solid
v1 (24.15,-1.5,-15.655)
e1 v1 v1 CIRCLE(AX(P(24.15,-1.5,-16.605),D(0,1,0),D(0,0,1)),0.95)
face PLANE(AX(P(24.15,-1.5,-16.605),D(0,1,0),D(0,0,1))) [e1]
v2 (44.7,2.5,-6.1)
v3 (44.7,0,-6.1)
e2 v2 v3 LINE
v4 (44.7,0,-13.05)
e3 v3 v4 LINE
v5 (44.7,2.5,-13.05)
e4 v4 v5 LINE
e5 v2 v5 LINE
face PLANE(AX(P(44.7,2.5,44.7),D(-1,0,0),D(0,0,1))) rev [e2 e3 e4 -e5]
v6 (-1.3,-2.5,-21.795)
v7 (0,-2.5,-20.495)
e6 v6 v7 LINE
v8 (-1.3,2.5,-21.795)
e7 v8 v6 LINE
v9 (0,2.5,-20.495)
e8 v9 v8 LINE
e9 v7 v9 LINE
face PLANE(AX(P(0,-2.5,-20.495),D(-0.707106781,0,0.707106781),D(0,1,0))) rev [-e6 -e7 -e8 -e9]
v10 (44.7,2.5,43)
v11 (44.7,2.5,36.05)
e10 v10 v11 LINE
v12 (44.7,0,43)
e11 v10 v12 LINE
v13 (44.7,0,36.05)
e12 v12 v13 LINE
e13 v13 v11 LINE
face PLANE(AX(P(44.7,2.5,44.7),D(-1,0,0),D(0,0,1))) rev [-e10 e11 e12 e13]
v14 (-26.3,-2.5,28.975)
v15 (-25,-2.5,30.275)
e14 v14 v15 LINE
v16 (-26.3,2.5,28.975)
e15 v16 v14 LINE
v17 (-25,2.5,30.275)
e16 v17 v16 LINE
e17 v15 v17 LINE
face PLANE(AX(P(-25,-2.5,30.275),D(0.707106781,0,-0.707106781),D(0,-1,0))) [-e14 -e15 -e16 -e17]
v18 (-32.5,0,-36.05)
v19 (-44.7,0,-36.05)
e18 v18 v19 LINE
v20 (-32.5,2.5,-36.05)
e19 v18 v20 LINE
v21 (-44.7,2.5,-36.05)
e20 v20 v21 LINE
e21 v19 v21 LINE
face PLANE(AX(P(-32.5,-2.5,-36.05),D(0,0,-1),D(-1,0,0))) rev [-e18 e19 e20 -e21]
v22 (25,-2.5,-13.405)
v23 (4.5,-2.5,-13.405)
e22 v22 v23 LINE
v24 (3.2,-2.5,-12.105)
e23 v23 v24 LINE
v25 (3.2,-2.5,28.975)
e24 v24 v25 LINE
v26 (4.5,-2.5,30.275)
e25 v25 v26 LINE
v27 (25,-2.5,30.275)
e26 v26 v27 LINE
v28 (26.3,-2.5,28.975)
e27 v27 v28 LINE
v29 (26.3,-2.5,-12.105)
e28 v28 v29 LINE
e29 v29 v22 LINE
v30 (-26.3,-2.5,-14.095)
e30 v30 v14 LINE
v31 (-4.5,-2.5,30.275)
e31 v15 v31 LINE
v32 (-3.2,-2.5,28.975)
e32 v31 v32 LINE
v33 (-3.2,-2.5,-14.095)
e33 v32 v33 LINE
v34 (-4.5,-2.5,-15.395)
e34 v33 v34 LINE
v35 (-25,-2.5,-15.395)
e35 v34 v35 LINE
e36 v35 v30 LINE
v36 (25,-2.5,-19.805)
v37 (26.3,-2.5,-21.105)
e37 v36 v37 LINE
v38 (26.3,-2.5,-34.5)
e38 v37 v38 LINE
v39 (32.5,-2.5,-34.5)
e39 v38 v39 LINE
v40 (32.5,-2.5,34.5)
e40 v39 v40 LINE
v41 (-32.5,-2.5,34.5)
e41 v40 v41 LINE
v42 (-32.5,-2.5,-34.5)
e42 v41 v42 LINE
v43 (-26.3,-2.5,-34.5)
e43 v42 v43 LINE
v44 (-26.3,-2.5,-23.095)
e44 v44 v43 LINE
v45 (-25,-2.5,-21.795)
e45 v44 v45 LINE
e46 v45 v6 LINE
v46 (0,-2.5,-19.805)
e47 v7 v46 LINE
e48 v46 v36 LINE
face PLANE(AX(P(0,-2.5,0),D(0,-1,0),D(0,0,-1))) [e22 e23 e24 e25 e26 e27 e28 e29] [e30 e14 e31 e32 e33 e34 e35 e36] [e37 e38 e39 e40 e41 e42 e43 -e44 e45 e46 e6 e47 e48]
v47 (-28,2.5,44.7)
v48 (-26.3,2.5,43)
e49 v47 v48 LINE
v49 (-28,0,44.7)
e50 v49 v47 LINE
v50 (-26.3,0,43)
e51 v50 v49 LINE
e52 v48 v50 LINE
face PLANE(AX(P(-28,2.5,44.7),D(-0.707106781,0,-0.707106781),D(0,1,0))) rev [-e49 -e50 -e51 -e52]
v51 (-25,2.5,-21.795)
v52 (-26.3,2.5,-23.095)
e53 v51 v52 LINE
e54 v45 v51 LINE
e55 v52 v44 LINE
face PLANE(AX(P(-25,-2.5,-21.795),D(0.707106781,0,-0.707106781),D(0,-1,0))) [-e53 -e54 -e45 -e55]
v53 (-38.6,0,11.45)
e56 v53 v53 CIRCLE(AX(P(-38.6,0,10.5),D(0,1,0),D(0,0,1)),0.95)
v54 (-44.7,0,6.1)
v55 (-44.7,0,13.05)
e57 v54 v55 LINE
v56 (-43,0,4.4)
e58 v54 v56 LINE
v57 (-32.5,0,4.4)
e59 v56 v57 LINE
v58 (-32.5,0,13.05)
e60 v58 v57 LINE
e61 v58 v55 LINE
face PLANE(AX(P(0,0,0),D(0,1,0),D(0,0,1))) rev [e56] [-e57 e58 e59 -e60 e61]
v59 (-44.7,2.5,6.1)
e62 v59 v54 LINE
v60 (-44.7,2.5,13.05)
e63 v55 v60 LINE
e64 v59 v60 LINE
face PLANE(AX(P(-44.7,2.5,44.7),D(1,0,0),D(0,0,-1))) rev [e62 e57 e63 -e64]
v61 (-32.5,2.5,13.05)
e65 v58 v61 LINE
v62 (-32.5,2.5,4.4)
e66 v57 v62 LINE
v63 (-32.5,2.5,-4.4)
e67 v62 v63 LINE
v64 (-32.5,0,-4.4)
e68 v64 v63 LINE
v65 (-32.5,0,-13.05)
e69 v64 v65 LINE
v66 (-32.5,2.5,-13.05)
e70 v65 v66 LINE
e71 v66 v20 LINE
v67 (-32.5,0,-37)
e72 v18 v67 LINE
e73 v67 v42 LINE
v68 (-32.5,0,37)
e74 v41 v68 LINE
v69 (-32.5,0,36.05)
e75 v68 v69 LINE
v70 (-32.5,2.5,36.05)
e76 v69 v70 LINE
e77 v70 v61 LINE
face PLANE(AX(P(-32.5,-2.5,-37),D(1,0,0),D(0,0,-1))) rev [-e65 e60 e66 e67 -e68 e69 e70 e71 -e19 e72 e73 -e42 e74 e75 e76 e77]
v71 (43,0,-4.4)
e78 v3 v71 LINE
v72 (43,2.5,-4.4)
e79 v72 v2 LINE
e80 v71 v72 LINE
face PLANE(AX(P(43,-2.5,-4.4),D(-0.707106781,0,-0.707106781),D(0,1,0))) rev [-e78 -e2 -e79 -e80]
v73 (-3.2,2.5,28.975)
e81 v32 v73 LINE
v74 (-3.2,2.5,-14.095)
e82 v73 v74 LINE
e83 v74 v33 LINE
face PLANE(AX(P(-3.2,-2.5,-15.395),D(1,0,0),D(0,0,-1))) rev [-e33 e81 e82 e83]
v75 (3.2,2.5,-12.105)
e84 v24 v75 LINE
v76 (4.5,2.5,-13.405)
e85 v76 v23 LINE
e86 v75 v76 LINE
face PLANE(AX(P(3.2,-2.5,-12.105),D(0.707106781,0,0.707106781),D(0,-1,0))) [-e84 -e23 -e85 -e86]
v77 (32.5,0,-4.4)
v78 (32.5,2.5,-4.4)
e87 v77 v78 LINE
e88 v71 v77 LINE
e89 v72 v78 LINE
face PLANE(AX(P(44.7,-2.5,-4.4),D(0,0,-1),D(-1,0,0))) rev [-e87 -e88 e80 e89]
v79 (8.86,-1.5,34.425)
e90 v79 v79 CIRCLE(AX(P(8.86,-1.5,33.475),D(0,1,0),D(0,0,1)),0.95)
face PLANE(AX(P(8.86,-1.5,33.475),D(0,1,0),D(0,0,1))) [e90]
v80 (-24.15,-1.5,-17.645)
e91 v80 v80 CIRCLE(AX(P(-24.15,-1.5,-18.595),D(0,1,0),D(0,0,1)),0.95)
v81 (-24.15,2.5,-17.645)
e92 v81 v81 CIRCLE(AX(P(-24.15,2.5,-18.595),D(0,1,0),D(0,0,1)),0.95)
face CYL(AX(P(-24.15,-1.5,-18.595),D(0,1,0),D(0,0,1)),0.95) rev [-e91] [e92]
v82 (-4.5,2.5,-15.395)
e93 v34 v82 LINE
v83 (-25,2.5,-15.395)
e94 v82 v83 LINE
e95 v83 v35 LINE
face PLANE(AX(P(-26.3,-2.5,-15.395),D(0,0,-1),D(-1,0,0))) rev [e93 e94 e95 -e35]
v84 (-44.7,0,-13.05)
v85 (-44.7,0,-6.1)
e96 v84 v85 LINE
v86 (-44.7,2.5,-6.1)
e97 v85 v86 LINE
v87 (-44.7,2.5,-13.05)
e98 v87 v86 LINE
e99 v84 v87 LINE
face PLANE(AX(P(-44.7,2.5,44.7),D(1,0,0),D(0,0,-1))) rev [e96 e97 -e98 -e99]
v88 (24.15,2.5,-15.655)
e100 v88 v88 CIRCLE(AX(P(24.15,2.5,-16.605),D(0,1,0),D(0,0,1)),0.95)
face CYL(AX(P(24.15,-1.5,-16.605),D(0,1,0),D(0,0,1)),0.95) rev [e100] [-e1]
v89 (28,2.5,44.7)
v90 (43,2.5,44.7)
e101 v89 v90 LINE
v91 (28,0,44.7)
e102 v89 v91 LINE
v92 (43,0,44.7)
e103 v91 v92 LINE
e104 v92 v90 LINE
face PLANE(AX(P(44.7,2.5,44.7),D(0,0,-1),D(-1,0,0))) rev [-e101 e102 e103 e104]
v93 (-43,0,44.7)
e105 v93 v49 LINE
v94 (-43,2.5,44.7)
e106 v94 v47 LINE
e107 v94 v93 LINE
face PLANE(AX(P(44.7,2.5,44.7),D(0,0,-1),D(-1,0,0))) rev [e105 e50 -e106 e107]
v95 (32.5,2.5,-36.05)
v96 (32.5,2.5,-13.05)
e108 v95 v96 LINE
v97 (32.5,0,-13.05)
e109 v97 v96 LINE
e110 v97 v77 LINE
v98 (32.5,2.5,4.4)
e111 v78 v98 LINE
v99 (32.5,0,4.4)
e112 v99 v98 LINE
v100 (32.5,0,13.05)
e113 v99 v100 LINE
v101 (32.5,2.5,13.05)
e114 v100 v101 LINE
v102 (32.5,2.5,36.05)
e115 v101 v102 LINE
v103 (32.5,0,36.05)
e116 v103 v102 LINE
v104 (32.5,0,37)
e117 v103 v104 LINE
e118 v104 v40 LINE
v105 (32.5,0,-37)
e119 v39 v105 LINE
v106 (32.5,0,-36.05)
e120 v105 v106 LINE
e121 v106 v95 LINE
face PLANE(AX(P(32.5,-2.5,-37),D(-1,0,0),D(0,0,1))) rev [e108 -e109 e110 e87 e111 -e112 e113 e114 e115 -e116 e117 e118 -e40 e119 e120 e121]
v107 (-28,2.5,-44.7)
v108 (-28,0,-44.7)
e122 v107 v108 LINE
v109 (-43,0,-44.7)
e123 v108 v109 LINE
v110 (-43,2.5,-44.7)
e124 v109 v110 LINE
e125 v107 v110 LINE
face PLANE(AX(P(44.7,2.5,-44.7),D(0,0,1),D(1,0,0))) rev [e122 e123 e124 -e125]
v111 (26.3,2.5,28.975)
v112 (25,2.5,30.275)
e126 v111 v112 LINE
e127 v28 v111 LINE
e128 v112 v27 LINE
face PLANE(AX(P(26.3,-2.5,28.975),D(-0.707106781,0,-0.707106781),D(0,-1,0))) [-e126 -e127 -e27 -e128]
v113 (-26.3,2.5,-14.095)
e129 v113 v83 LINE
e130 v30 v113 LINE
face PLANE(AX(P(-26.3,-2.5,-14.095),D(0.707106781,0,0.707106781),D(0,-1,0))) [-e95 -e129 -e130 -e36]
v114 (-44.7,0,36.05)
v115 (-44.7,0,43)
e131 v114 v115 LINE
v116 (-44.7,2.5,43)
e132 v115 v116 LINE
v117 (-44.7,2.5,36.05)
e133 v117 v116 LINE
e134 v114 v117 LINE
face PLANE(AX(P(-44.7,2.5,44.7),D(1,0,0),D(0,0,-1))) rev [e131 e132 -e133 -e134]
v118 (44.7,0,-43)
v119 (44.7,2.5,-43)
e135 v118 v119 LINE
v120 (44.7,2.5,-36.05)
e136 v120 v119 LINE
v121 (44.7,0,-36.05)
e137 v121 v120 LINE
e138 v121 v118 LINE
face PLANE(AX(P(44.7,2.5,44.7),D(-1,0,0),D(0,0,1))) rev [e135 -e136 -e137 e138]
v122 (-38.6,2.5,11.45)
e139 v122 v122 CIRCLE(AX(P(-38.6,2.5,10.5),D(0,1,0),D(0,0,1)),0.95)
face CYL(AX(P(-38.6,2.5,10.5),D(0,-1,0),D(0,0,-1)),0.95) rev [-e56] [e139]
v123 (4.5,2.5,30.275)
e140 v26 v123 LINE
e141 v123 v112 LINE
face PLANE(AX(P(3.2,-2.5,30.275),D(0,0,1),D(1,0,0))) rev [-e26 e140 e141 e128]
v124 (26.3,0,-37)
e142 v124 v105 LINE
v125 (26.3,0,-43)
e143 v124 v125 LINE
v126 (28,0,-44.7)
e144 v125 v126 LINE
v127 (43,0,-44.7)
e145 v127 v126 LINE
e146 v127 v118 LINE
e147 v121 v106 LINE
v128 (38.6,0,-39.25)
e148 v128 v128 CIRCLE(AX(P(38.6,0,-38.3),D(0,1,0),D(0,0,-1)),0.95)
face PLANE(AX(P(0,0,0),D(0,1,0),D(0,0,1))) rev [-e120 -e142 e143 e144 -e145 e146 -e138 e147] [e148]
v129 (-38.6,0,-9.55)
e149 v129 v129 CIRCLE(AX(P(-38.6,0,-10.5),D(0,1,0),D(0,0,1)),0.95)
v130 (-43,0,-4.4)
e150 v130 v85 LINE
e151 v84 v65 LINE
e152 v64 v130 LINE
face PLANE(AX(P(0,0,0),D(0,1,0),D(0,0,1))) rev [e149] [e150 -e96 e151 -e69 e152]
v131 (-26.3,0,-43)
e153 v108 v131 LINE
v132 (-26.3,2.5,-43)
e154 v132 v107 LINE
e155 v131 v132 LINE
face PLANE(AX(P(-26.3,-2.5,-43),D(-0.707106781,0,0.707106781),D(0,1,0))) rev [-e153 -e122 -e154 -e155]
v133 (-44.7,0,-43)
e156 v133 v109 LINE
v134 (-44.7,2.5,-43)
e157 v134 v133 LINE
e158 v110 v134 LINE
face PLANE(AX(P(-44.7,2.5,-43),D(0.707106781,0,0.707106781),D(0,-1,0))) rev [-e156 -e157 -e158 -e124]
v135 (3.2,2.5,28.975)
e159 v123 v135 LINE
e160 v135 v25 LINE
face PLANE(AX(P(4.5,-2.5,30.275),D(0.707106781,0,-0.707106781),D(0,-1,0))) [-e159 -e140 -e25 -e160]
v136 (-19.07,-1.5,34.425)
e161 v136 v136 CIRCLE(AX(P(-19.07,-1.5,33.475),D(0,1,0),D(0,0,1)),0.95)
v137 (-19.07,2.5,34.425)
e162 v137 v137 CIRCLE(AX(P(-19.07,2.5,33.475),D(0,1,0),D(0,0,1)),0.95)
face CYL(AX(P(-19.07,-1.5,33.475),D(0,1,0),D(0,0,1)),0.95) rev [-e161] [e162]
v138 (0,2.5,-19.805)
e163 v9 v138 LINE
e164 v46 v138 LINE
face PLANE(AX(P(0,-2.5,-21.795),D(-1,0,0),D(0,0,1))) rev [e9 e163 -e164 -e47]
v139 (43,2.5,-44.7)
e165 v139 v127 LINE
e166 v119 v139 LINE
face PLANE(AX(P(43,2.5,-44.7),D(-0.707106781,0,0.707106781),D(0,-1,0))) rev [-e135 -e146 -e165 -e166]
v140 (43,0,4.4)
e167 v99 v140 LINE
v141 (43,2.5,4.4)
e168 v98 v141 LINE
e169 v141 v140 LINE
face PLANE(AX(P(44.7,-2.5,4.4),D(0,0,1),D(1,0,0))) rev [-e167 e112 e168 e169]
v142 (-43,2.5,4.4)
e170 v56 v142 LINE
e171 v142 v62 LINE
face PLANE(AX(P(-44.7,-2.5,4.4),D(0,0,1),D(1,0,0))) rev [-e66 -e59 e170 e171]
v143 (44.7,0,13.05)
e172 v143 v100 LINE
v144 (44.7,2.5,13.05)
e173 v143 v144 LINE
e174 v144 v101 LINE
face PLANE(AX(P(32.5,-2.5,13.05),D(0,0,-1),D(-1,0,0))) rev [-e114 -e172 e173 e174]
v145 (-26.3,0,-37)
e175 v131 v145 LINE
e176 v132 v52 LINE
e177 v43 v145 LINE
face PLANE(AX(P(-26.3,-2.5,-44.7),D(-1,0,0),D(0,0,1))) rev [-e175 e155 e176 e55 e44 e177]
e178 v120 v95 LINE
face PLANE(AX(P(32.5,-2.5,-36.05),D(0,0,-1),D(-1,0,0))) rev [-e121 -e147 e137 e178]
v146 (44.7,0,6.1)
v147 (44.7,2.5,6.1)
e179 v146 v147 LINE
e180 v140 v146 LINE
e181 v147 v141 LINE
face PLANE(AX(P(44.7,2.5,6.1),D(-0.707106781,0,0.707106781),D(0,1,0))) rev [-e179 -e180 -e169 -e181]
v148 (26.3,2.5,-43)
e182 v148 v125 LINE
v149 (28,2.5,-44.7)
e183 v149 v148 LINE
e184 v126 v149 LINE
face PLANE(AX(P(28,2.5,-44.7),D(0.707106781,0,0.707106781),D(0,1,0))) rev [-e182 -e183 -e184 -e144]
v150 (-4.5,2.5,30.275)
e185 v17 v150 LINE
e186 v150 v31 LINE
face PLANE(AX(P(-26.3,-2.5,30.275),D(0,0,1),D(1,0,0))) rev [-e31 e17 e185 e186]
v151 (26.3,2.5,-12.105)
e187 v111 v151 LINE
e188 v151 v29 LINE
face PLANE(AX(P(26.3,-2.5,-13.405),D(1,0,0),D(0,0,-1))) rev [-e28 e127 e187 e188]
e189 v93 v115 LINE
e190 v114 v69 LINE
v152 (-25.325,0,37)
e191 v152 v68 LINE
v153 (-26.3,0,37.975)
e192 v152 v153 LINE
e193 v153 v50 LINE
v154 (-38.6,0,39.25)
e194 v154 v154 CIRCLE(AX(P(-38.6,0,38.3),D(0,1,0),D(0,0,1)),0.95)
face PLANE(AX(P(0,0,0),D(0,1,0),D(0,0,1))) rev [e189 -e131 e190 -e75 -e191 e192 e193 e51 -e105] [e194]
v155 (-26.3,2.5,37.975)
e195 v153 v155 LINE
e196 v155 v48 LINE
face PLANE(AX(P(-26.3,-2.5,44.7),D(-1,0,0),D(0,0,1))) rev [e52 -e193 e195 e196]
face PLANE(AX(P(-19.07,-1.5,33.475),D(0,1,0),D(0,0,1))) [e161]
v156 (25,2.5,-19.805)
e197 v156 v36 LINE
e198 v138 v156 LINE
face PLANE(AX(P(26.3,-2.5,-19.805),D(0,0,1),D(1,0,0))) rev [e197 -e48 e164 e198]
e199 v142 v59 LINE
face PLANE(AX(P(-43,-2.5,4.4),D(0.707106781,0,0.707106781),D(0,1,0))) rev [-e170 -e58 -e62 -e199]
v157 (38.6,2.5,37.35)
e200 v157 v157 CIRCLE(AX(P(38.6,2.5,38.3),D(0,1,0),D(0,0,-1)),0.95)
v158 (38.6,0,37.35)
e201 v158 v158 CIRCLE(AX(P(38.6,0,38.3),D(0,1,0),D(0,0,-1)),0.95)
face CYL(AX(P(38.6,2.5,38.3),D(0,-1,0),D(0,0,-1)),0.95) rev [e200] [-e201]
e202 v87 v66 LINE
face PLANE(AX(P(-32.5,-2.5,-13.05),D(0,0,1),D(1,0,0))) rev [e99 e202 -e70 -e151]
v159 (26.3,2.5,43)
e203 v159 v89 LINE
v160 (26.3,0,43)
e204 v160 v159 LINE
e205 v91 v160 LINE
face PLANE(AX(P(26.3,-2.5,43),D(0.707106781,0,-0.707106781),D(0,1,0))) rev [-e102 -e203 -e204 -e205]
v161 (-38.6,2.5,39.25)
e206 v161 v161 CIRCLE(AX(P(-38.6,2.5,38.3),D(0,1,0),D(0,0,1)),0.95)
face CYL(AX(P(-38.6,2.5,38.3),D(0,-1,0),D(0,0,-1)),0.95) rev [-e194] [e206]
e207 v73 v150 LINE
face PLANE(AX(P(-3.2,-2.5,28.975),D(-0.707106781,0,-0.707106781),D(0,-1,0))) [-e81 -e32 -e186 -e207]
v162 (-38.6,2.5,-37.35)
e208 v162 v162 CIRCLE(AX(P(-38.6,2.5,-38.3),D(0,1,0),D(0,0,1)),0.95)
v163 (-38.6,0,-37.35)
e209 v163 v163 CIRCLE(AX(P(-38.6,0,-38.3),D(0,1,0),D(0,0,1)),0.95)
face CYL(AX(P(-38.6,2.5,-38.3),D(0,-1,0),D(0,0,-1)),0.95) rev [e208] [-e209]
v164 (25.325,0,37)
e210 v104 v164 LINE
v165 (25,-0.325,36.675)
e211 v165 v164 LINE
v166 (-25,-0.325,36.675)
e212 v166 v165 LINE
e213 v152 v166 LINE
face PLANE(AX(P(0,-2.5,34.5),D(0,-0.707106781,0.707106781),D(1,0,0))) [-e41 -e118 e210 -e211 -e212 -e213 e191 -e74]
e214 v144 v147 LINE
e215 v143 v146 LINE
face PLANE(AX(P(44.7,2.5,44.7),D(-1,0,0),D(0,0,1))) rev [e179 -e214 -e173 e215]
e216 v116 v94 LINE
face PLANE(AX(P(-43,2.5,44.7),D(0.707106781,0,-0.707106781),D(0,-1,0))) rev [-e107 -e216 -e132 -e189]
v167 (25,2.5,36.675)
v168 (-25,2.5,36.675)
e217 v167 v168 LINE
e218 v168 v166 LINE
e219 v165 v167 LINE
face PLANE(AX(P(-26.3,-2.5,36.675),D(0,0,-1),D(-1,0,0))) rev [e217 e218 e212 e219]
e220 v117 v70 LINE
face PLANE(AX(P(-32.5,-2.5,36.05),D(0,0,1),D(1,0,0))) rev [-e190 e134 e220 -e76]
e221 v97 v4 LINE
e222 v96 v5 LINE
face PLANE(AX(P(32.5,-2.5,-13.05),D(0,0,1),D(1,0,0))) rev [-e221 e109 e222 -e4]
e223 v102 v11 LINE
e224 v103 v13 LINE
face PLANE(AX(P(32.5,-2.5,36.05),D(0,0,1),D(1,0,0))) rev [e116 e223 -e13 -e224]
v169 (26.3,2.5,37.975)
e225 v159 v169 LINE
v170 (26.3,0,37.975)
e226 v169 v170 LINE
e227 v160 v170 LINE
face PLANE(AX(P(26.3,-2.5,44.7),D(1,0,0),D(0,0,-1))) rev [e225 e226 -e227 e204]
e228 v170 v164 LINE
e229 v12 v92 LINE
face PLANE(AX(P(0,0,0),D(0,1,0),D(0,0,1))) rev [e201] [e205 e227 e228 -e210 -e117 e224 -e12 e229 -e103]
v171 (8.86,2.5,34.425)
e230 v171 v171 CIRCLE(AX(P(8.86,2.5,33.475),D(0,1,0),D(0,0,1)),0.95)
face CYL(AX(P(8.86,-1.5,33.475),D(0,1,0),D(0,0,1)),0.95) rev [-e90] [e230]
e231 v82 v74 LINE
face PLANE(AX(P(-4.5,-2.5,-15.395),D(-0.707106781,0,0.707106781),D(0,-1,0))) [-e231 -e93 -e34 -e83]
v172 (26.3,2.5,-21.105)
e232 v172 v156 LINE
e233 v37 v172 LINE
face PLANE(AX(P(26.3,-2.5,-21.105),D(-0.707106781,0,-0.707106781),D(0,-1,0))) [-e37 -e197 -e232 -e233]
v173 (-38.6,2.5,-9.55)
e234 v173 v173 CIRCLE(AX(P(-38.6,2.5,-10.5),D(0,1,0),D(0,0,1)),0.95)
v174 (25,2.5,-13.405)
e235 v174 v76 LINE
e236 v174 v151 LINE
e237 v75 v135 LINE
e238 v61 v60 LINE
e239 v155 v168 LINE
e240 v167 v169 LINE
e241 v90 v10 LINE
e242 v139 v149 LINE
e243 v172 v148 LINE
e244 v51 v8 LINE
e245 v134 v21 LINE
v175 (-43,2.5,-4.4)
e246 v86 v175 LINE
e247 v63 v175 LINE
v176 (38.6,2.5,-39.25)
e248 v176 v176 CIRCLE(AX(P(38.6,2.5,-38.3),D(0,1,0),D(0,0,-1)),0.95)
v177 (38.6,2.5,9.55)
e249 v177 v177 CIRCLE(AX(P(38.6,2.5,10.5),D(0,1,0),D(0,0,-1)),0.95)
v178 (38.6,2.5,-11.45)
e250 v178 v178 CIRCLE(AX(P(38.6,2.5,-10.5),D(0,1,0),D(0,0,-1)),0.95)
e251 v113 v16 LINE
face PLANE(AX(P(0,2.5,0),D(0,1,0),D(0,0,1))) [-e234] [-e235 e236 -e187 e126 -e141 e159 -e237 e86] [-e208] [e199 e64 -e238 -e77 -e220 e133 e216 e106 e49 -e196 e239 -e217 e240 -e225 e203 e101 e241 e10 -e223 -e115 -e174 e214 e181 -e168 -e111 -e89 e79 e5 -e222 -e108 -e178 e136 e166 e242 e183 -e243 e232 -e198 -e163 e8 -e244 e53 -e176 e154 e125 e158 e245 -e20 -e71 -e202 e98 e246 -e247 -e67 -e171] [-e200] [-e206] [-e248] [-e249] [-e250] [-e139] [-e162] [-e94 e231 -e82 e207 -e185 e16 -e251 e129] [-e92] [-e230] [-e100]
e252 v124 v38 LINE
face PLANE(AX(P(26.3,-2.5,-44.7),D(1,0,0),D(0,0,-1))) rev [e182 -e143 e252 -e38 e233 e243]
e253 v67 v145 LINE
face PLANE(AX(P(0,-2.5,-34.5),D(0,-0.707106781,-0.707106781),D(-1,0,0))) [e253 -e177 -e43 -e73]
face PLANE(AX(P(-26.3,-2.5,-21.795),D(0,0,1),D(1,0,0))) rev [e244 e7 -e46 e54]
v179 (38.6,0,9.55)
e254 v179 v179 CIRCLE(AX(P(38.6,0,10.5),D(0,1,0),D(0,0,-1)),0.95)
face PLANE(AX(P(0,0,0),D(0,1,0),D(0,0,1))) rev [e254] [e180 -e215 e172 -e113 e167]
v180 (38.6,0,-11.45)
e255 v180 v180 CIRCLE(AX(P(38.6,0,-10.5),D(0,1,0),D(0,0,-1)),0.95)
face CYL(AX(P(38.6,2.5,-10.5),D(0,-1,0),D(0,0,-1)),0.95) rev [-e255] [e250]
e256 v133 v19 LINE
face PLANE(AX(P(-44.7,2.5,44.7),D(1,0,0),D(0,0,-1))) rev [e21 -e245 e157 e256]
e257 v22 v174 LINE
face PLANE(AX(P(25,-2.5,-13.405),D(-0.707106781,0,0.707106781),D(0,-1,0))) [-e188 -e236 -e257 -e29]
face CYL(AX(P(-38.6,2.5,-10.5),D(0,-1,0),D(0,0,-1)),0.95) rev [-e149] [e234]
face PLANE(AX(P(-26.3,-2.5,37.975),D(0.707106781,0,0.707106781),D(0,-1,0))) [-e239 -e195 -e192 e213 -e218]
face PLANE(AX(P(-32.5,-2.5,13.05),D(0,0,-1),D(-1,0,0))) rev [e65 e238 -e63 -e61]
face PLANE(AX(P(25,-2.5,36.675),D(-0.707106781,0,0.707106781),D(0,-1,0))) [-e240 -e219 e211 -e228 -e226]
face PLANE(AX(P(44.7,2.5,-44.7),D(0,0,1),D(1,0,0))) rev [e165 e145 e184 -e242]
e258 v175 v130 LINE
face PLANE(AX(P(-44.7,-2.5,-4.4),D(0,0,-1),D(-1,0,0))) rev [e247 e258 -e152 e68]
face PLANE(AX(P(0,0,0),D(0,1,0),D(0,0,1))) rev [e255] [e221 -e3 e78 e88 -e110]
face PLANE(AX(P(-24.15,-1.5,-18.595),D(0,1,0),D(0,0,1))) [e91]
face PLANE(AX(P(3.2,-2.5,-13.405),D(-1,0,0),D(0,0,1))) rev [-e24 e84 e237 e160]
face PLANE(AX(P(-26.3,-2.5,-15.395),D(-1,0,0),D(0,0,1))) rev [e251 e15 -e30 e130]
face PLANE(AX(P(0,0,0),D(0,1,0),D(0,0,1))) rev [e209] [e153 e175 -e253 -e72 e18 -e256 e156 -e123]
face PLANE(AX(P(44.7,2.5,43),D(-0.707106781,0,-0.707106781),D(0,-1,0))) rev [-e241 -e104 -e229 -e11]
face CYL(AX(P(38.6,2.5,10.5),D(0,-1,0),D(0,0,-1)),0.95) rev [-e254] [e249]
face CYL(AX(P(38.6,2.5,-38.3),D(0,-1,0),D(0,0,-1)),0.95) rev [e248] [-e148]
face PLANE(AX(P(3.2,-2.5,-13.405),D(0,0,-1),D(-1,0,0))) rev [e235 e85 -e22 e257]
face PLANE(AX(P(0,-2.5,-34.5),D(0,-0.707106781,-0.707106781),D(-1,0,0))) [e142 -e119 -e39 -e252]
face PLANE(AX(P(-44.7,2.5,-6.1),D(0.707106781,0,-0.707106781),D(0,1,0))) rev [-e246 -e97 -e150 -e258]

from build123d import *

# Parameters (mm, degrees)
SKETCH1_W               = 89.4
SKETCH1_H               = 89.4
SKETCH1_R               = 0.95
BOSS_EXTRUDE1_DEPTH     = 2.5
SKETCH5_W               = 65
SKETCH5_H               = 74
BOSS_EXTRUDE3_DEPTH     = 2.5
SKETCH7_R               = 0.95
CUT_EXTRUDE2_DEPTH      = 4
CUT_EXTRUDE1_DEPTH      = 64.412774738
CUT_EXTRUDE1_DEPTH_BACK = 64.412774738
SKETCH2_W               = 12.2
SKETCH2_H               = 23
SKETCH2_W_2             = 52.6
SKETCH2_H_2             = 8.025
SKETCH2_W_3             = 23.1
SKETCH2_H_3             = 45.67
SKETCH2_H_4             = 43.68
SKETCH2_H_5             = 8.8
CHAMFER2_SIZE           = 1.3
CHAMFER3_SIZE           = 1.3
CHAMFER4_SIZE           = 1.7
CHAMFER5_SIZE           = 2.5


with BuildPart() as part:
    # Sketch1 → Boss-Extrude1 (new body)
    with BuildSketch(Plane(origin=(0, 0, 0), x_dir=(1, 0, 0), z_dir=(0, 1, 0))):
        Rectangle(SKETCH1_W, SKETCH1_H)
        with Locations(Location((-38.6, 38.3, 0), (0, 0, 270))):
            Circle(SKETCH1_R, mode=Mode.SUBTRACT)
        with Locations(Location((-38.6, 10.5, 0), (0, 0, 270))):
            Circle(SKETCH1_R, mode=Mode.SUBTRACT)
        with Locations(Location((-38.6, -10.5, 0), (0, 0, 270))):
            Circle(SKETCH1_R, mode=Mode.SUBTRACT)
        with Locations(Location((-38.6, -38.3, 0), (0, 0, 270))):
            Circle(SKETCH1_R, mode=Mode.SUBTRACT)
        with Locations(Location((38.6, -38.3, 0), (0, 0, 90))):
            Circle(SKETCH1_R, mode=Mode.SUBTRACT)
        with Locations(Location((38.6, -10.5, 0), (0, 0, 90))):
            Circle(SKETCH1_R, mode=Mode.SUBTRACT)
        with Locations(Location((38.6, 10.5, 0), (0, 0, 90))):
            Circle(SKETCH1_R, mode=Mode.SUBTRACT)
        with Locations(Location((38.6, 38.3, 0), (0, 0, 90))):
            Circle(SKETCH1_R, mode=Mode.SUBTRACT)
    extrude(amount=BOSS_EXTRUDE1_DEPTH)

    # Sketch5 → Boss-Extrude3 (add)
    with BuildSketch(Plane.XZ):
        Rectangle(SKETCH5_W, SKETCH5_H)
    extrude(amount=BOSS_EXTRUDE3_DEPTH)

    # Sketch7 → Cut-Extrude2 (cut)
    with BuildSketch(Plane(origin=(0, 2.5, 0), x_dir=(1, 0, 0), z_dir=(0, 1, 0))):
        with Locations(Location((-24.15, 18.595, 0), (0, 0, 270))):
            Circle(SKETCH7_R)
        with Locations(Location((24.15, 16.605, 0), (0, 0, 270))):
            Circle(SKETCH7_R)
        with Locations(Location((-19.07, -33.475, 0), (0, 0, 270))):
            Circle(SKETCH7_R)
        with Locations(Location((8.86, -33.475, 0), (0, 0, 270))):
            Circle(SKETCH7_R)
    extrude(amount=-CUT_EXTRUDE2_DEPTH, mode=Mode.SUBTRACT)

    # Sketch2 → Cut-Extrude1 (cut, two sides: drawn at the far end of the back side and taken through both)
    with BuildSketch(Plane(origin=(0, 2.5, 0), x_dir=(1, 0, 0), z_dir=(0, 1, 0)).offset(-CUT_EXTRUDE1_DEPTH_BACK)):
        with Locations((-38.6, 24.55)):
            Rectangle(SKETCH2_W, SKETCH2_H)
        Polygon((-26.3, 44.7), (26.3, 44.7), (26.3, 24.23), (26.3, 19.805), (0, 19.805), (0, 21.795), (-26.3, 21.795), align=None)
        with Locations((0, -40.6875)):
            Rectangle(SKETCH2_W_2, SKETCH2_H_2)
        with Locations((-14.75, -7.44)):
            Rectangle(SKETCH2_W_3, SKETCH2_H_3)
        with Locations((14.75, -8.435)):
            Rectangle(SKETCH2_W_3, SKETCH2_H_4)
        with Locations((-38.6, 0)):
            Rectangle(SKETCH2_W, SKETCH2_H_5)
        with Locations((38.6, 0)):
            Rectangle(SKETCH2_W, SKETCH2_H_5)
        with Locations((38.6, 24.55)):
            Rectangle(SKETCH2_W, SKETCH2_H)
        with Locations((38.6, -24.55)):
            Rectangle(SKETCH2_W, SKETCH2_H)
        with Locations((-38.6, -24.55)):
            Rectangle(SKETCH2_W, SKETCH2_H)
    extrude(amount=CUT_EXTRUDE1_DEPTH + CUT_EXTRUDE1_DEPTH_BACK, mode=Mode.SUBTRACT)

    # Chamfer2
    chamfer2_edges = [part.edges().sort_by_distance(p)[0] for p in [
        (0, 0, -21.795),
    ]]
    chamfer(chamfer2_edges, length=CHAMFER2_SIZE)

    # Chamfer3
    chamfer3_edges = [part.edges().sort_by_distance(p)[0] for p in [
        (-26.3, 0, -21.795),
        (26.3, 0, 36.675),
        (-26.3, 0, 36.675),
        (-26.3, 0, 30.275),
        (-3.2, 0, 30.275),
        (3.2, 0, 30.275),
        (26.3, 0, 30.275),
        (-3.2, 0, -15.395),
        (3.2, 0, -13.405),
        (26.3, 0, -13.405),
        (26.3, 0, -19.805),
        (-26.3, 0, -15.395),
    ]]
    chamfer(chamfer3_edges, length=CHAMFER3_SIZE)

    # Chamfer4
    chamfer4_edges = [part.edges().sort_by_distance(p)[0] for p in [
        (26.3, 1.25, 44.7),
        (-26.3, 1.25, 44.7),
        (-44.7, 1.25, 4.4),
        (-44.7, 1.25, -4.4),
        (-26.3, 1.25, -44.7),
        (26.3, 1.25, -44.7),
        (44.7, 1.25, -4.4),
        (44.7, 1.25, 4.4),
        (-44.7, 1.25, -44.7),
        (44.7, 1.25, -44.7),
        (44.7, 1.25, 44.7),
        (-44.7, 1.25, 44.7),
    ]]
    chamfer(chamfer4_edges, length=CHAMFER4_SIZE)

    # Chamfer5
    chamfer5_edges = [part.edges().sort_by_distance(p)[0] for p in [
        (28.9125, -2.5, 37),
        (29.4, -2.5, -37),
        (-29.4, -2.5, -37),
    ]]
    chamfer(chamfer5_edges, length=CHAMFER5_SIZE - 0.0001)  # a hair under: the kernel refuses the full size


solid = part.part
